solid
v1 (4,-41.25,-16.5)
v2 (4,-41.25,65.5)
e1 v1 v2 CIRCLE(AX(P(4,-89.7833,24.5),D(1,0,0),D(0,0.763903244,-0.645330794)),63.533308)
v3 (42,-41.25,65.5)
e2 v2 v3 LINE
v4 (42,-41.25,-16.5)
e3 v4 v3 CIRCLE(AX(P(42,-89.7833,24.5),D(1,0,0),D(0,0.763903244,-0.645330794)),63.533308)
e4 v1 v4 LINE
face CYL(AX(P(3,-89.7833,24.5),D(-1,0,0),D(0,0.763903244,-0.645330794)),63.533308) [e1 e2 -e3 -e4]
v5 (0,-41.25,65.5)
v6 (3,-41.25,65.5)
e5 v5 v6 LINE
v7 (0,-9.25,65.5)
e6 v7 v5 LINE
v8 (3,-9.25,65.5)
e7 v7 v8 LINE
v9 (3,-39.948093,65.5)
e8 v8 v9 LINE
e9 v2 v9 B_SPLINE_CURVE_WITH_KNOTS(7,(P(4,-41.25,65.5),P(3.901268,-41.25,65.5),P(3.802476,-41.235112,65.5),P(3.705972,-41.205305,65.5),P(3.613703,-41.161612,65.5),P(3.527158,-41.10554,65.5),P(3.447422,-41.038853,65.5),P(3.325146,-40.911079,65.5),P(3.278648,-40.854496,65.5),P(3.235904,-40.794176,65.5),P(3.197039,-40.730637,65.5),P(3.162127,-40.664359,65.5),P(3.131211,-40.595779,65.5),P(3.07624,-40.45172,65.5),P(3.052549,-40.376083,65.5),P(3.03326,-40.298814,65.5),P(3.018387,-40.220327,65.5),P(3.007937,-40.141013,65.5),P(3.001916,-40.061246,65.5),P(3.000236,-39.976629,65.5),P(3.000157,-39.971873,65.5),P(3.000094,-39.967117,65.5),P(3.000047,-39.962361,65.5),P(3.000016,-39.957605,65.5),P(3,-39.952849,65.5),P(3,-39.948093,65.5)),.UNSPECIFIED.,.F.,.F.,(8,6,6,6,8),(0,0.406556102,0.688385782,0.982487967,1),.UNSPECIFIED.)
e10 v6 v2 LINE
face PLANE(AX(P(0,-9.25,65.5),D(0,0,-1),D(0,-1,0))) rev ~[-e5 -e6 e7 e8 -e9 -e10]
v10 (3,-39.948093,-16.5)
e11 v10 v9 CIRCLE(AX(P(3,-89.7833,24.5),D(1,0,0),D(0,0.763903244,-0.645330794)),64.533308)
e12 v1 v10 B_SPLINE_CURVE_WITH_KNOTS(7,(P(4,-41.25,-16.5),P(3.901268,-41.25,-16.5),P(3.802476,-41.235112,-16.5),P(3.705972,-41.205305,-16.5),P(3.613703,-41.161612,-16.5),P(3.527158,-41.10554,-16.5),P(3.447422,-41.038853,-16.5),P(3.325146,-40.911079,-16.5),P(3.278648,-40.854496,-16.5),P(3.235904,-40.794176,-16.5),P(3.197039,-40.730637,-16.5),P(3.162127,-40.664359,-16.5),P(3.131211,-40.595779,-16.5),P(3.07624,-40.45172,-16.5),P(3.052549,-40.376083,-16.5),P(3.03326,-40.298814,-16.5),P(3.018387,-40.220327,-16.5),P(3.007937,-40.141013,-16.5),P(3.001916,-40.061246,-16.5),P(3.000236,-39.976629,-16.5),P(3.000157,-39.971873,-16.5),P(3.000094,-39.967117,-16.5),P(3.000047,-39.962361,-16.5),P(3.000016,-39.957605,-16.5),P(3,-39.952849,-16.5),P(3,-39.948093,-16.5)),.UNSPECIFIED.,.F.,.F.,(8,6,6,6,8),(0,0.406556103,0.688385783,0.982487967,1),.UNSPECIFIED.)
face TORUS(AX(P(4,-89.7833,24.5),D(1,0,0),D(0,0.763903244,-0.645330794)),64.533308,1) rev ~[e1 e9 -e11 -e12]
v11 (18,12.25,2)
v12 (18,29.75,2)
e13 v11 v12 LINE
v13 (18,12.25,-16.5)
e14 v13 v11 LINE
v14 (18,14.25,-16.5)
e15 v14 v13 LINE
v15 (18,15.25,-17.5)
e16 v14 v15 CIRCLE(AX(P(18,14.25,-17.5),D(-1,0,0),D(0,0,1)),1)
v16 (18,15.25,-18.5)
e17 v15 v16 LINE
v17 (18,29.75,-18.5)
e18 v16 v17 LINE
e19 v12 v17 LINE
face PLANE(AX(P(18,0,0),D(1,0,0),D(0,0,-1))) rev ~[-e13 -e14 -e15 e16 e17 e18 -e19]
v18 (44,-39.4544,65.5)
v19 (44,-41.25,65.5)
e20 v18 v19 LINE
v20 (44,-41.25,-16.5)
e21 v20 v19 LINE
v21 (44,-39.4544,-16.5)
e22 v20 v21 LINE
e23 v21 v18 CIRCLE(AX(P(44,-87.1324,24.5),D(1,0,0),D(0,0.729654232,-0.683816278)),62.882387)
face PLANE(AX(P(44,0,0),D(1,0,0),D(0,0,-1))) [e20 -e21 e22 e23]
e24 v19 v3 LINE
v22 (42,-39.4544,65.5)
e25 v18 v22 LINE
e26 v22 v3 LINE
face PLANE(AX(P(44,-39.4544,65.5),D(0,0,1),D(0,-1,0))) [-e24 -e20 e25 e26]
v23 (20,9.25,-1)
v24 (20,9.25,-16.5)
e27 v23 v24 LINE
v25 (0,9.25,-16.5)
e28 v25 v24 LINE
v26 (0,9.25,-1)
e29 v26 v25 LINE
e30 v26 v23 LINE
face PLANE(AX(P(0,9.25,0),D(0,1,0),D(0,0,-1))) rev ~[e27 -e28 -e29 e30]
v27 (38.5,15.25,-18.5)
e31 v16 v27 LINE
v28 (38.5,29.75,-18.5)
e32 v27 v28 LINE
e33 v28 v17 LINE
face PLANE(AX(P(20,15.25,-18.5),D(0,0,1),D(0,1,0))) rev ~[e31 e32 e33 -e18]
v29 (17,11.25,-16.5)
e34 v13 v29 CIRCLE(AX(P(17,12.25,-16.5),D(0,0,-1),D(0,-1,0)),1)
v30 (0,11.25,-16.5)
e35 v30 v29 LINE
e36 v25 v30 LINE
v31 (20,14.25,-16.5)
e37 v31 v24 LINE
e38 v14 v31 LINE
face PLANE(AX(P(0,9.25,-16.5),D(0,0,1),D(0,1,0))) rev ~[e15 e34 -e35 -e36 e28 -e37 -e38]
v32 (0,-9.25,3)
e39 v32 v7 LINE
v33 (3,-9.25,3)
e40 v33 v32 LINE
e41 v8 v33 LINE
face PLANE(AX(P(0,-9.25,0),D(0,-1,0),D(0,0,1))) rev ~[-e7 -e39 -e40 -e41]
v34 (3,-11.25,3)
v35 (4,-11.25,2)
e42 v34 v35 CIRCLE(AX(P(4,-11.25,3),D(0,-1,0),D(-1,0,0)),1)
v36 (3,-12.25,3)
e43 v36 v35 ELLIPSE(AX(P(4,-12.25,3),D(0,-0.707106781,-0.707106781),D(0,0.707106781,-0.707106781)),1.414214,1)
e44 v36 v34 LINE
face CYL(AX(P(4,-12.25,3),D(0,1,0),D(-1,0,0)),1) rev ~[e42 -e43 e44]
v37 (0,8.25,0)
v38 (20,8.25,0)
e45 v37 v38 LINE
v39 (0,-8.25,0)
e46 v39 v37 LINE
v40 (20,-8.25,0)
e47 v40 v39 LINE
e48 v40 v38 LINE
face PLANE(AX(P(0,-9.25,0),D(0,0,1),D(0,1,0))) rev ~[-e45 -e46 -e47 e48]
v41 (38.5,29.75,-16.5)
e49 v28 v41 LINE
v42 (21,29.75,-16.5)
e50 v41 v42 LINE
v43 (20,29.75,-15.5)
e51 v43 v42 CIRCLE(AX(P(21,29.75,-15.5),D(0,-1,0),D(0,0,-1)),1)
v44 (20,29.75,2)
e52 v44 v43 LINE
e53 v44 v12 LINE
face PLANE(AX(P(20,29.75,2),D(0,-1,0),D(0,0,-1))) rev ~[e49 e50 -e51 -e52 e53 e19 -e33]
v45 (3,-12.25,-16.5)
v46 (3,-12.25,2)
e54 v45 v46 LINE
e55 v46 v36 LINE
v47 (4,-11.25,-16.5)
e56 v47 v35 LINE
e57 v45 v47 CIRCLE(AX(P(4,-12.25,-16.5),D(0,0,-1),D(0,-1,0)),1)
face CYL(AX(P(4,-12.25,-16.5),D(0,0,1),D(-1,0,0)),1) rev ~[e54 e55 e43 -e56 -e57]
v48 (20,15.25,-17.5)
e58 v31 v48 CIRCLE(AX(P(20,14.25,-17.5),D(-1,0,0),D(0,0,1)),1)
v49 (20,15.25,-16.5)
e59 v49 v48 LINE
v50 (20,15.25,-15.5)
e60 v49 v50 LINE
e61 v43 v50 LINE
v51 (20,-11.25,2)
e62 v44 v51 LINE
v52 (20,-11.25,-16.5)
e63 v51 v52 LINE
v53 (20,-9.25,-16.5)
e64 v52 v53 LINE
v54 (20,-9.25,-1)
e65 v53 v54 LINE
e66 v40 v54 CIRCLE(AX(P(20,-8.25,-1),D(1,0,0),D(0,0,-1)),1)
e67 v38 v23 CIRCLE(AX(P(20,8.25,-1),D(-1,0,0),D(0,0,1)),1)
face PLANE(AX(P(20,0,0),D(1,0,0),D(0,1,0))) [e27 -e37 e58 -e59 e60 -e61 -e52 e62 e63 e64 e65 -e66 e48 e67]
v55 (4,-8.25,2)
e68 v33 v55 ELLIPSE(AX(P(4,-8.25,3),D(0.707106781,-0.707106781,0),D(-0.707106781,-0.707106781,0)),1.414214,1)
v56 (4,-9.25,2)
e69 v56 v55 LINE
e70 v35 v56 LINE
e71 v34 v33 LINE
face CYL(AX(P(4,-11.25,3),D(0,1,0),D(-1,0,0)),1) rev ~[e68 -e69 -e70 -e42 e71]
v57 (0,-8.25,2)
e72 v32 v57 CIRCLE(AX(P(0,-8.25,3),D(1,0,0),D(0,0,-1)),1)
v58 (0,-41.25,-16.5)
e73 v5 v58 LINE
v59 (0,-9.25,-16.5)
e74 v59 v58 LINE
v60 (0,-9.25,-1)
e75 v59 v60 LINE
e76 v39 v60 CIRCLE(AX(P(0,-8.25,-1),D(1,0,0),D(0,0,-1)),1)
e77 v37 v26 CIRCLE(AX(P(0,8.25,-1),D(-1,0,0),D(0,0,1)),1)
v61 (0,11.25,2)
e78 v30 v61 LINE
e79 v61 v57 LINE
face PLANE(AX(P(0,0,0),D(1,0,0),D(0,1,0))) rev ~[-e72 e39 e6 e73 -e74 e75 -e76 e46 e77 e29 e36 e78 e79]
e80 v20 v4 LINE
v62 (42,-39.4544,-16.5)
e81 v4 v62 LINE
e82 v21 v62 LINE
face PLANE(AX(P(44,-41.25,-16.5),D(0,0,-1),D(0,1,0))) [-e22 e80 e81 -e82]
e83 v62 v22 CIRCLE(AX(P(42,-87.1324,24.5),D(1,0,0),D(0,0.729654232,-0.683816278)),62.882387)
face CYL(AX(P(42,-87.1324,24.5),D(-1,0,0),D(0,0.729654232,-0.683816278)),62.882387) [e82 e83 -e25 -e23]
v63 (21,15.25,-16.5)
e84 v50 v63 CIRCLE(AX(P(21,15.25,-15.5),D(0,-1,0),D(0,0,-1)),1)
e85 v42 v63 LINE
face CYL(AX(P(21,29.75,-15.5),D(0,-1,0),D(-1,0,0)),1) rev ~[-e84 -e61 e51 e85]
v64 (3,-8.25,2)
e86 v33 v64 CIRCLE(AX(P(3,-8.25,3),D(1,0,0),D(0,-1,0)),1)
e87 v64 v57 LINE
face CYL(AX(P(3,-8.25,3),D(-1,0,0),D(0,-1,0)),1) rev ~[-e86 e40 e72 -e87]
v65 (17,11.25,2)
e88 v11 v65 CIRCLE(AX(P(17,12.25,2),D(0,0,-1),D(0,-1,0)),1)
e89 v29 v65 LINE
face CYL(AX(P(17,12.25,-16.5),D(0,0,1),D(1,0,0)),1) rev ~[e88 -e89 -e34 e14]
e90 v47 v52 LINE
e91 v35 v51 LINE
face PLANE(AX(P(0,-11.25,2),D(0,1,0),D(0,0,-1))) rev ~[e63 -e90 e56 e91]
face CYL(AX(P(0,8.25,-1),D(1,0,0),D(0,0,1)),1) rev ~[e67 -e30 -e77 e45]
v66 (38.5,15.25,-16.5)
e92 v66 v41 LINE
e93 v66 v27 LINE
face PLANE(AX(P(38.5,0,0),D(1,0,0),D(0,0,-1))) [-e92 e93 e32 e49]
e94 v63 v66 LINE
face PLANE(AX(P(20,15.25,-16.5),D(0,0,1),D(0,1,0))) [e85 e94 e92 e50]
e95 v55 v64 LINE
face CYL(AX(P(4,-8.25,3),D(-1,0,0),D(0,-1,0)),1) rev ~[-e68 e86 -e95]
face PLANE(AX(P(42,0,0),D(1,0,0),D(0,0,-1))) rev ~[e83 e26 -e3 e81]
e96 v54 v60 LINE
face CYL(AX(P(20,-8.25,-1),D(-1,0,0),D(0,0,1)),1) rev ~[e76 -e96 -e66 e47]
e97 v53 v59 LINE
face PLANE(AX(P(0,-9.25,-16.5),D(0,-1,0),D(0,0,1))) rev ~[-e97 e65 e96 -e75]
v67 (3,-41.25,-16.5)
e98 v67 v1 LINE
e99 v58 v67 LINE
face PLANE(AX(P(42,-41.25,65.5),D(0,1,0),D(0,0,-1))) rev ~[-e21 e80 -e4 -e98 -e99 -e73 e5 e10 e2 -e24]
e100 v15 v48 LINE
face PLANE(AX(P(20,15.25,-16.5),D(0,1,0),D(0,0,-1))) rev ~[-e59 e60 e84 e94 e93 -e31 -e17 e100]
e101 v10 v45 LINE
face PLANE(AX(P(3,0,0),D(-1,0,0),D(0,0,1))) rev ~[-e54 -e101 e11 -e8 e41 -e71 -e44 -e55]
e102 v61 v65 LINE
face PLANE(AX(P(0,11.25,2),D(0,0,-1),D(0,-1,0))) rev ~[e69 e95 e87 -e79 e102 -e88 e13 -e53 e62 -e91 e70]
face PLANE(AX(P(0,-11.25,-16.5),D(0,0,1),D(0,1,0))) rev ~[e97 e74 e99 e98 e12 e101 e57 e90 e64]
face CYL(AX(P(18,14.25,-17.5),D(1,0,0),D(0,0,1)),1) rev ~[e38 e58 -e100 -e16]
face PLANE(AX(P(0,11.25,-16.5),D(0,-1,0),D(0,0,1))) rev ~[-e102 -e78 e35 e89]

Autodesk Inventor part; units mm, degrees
ref_plane "YZ Plane" through (0, 0, 0) normal (1, 0, 0) x (0, 1, 0)
ref_plane "XZ Plane" through (0, 0, 0) normal (0, 1, 0) x (-1, 0, 0)
ref_plane "XY Plane" through (0, 0, 0) normal (0, 0, 1) x (1, 0, 0)
sketch "Sketch1" plane through (0, 0, 0) normal (1, 0, 0) x (0, 1, 0)
  line L0 (9.25, -16.5) -> (11.25, -16.5)
  line L1 (11.25, -16.5) -> (11.25, 2)
  line L2 (11.25, 2) -> (-11.25, 2)
  line L3 (-11.25, 2) -> (-11.25, -16.5)
  line L4 (-11.25, -16.5) -> (-9.25, -16.5)
  line L5 (-9.25, -16.5) -> (-9.25, 0)
  line L6 (-9.25, 0) -> (9.25, 0)
  line L7 (9.25, 0) -> (9.25, -16.5)
  point P0 (0, 0)
  point P1 (0, 0)
  point P2 (10.25, -16.5)
  point P3 (-10.25, -16.5)
  dimension "d0" = 18.5
  dimension "d1" = 2
  dimension "d2" = 2
  dimension "d3" = 18.5
extrude "Extrusion1" add sketch "Sketch1" along normal blind 20
sketch "Sketch2" plane through (20, 0, 0) normal (1, 0, 0) x (0, 0, -1)
  line L0 (16.5, 9.25) -> (16.5, 11.25) projected
  line L1 (16.5, 11.25) -> (-2, 11.25) projected
  line L2 (-2, 11.25) -> (-2, -11.25) projected
  line L3 (-2, -11.25) -> (16.5, -11.25) projected
  line L4 (16.5, -11.25) -> (16.5, -9.25) projected
  line L5 (16.5, -9.25) -> (0, -9.25) projected
  line L6 (0, -9.25) -> (0, 9.25) projected
  line L7 (0, 9.25) -> (16.5, 9.25) projected
  line L8 (16.5, 9.25) -> (16.5, 11.25) projected
  line L9 (16.5, 11.25) -> (-2, 11.25)
  line L10 (-2, 11.25) -> (-2, 29.75)
  line L11 (-2, 29.75) -> (16.5, 29.75)
  line L12 (16.5, 29.75) -> (16.5, 11.25)
  point P0 (0, 0)
  dimension "d6" = 18.5
extrude "Extrusion2" add sketch "Sketch2" against normal blind 2 contours L1 L10 L11 L12
sketch "Sketch3" plane through (20, 0, 0) normal (1, 0, 0) x (0, 0, -1)
  line L0 (16.5, 9.25) -> (16.5, 29.75) projected
  line L1 (16.5, 29.75) -> (-2, 29.75) projected
  line L2 (-2, 29.75) -> (-2, -11.25) projected
  line L3 (-2, -11.25) -> (16.5, -11.25) projected
  line L4 (16.5, -11.25) -> (16.5, -9.25) projected
  line L5 (16.5, -9.25) -> (0, -9.25) projected
  line L6 (0, -9.25) -> (0, 9.25) projected
  line L7 (0, 9.25) -> (16.5, 9.25) projected
  line L8 (16.5, 29.75) -> (16.5, 15.25)
  line L9 (16.5, 9.25) -> (16.5, 29.75) projected
  line L10 (16.5, 15.25) -> (18.5, 15.25)
  line L11 (18.5, 15.25) -> (18.5, 29.75)
  line L12 (18.5, 29.75) -> (16.5, 29.75)
  point P0 (0, 0)
  dimension "d9" = 6
  dimension "d10" = 2
extrude "Extrusion3" add sketch "Sketch3" along normal blind 18.5 and the other way blind 2 contours L0 L12 L11 L10
sketch "Sketch4" plane through (0, 0, 0) normal (-1, 0, 0) x (0, 0, 1)
  line L0 (-16.5, 9.25) -> (-16.5, 11.25) projected
  line L1 (0, 9.25) -> (-16.5, 9.25) projected
  line L2 (0, -9.25) -> (0, 9.25) projected
  line L3 (-16.5, -9.25) -> (0, -9.25) projected
  line L4 (-16.5, -11.25) -> (-16.5, -9.25) projected
  line L5 (2, -11.25) -> (-16.5, -11.25) projected
  line L6 (2, 11.25) -> (2, -11.25) projected
  line L7 (-16.5, 11.25) -> (2, 11.25) projected
  line L8 (-16.5, -9.25) -> (0, -9.25) projected
  line L9 (-16.5, -9.25) -> (65.5, -9.25)
  line L10 (65.5, -9.25) -> (65.5, -41.25)
  line L11 (65.5, -41.25) -> (-16.5, -41.25)
  line L12 (-16.5, -41.25) -> (-16.5, -9.25)
  point P0 (0, 0)
  dimension "d15" = 82
  dimension "d16" = 30
extrude "Extrusion4" add sketch "Sketch4" against normal blind 3 contours L9 L6 L5 L4 L3 | L9 L10 L11 L12 L5 L6
sketch "Sketch5" plane through (3, 0, 0) normal (1, 0, 0) x (0, 0, -1)
  line L0 (-2, -9.25) -> (-2, -11.25) projected
  line L1 (-2, -9.25) -> (-65.5, -9.25) projected
  line L2 (-65.5, -9.25) -> (-65.5, -41.25) projected
  line L3 (-65.5, -41.25) -> (16.5, -41.25) projected
  line L4 (16.5, -41.25) -> (16.5, -11.25) projected
  line L5 (-2, -11.25) -> (16.5, -11.25) projected
  arc A0 (16.5, -41.25) -> (-65.5, -41.25) centre (-24.5, -89.7833) ccw
  point P0 (0, 0)
  dimension "d20" = 15
extrude "Extrusion5" add sketch "Sketch5" along normal blind 39 contours A0 L3
sketch "Sketch7" plane through (42, 0, 0) normal (1, 0, 0) x (0, 0, -1)
  line L0 (-65.5, -41.25) -> (16.5, -41.25) projected
  arc A0 (16.5, -41.25) -> (-65.5, -41.25) centre (-24.5, -89.7833) ccw projected
  line L1 (-67.5, -41.25) -> (18.5, -41.25)
  arc A1 (18.5, -41.25) -> (-67.5, -41.25) centre (-24.5, -87.1324) ccw
  point P0 (0, 0)
  dimension "d33" = 2
  dimension "d34" = 2
  dimension "d35" = 2
extrude "Extrusion6" add sketch "Sketch7" along normal blind 2
sketch "Sketch8" plane through (44, 0, 0) normal (1, 0, 0) x (0, 0, -1)
  arc A0 (16.5, -41.25) -> (-65.5, -41.25) centre (-24.5, -89.7833) ccw projected
  line L0 (16.5, -41.25) -> (16.5, -11.25) projected
  line L1 (-2, -11.25) -> (16.5, -11.25) projected
  line L2 (-2, -9.25) -> (-2, -11.25) projected
  line L3 (-2, -9.25) -> (-65.5, -9.25) projected
  line L4 (-65.5, -9.25) -> (-65.5, -41.25) projected
  line L5 (-67.5, -41.25) -> (18.5, -41.25) projected
  arc A1 (18.5, -41.25) -> (-67.5, -41.25) centre (-24.5, -87.1324) ccw projected
  arc A2 (18.5, -41.25) -> (-67.5, -41.25) centre (-24.5, -87.1324) ccw projected
  line L6 (-67.5, -41.25) -> (-65.5, -41.25)
  line L7 (-65.5, -41.25) -> (-65.5, -39.4544)
  line L8 (-65.5, -39.4544) -> (-67.5, -39.4544)
  line L9 (-67.5, -39.4544) -> (-67.5, -41.25)
  line L10 (16.5, -41.25) -> (18.5, -41.25) projected
  line L11 (16.5, -9.25) -> (16.5, -41.25) projected
  line L12 (18.5, -41.25) -> (16.5, -41.25)
  line L13 (16.5, -41.25) -> (16.5, -39.4544)
  line L14 (16.5, -39.4544) -> (18.5, -39.4544)
  line L15 (18.5, -39.4544) -> (18.5, -41.25)
  point P0 (0, 0)
extrude "Extrusion7" cut sketch "Sketch8" against normal up to surface (2 mm away) contours L0 A1 L5 | L5 A1 L4
fillet "Fillet1" radius 1 9 edges at (3, -26.25, 24.5) (20, 22.5, -16.5) (1.5, -9.25, 2) (3, -10.25, 2) (3, -11.25, -7.25) (10, 9.25, 0) (10, -9.25, 0) (18, 11.25, -7.25) (19, 15.25, -16.5)
equation "\"d2\" = d1"
equation "\"d3\" = d0"
equation "\"d34\" = d33"
properties part number "headphonesDeskHanger"
